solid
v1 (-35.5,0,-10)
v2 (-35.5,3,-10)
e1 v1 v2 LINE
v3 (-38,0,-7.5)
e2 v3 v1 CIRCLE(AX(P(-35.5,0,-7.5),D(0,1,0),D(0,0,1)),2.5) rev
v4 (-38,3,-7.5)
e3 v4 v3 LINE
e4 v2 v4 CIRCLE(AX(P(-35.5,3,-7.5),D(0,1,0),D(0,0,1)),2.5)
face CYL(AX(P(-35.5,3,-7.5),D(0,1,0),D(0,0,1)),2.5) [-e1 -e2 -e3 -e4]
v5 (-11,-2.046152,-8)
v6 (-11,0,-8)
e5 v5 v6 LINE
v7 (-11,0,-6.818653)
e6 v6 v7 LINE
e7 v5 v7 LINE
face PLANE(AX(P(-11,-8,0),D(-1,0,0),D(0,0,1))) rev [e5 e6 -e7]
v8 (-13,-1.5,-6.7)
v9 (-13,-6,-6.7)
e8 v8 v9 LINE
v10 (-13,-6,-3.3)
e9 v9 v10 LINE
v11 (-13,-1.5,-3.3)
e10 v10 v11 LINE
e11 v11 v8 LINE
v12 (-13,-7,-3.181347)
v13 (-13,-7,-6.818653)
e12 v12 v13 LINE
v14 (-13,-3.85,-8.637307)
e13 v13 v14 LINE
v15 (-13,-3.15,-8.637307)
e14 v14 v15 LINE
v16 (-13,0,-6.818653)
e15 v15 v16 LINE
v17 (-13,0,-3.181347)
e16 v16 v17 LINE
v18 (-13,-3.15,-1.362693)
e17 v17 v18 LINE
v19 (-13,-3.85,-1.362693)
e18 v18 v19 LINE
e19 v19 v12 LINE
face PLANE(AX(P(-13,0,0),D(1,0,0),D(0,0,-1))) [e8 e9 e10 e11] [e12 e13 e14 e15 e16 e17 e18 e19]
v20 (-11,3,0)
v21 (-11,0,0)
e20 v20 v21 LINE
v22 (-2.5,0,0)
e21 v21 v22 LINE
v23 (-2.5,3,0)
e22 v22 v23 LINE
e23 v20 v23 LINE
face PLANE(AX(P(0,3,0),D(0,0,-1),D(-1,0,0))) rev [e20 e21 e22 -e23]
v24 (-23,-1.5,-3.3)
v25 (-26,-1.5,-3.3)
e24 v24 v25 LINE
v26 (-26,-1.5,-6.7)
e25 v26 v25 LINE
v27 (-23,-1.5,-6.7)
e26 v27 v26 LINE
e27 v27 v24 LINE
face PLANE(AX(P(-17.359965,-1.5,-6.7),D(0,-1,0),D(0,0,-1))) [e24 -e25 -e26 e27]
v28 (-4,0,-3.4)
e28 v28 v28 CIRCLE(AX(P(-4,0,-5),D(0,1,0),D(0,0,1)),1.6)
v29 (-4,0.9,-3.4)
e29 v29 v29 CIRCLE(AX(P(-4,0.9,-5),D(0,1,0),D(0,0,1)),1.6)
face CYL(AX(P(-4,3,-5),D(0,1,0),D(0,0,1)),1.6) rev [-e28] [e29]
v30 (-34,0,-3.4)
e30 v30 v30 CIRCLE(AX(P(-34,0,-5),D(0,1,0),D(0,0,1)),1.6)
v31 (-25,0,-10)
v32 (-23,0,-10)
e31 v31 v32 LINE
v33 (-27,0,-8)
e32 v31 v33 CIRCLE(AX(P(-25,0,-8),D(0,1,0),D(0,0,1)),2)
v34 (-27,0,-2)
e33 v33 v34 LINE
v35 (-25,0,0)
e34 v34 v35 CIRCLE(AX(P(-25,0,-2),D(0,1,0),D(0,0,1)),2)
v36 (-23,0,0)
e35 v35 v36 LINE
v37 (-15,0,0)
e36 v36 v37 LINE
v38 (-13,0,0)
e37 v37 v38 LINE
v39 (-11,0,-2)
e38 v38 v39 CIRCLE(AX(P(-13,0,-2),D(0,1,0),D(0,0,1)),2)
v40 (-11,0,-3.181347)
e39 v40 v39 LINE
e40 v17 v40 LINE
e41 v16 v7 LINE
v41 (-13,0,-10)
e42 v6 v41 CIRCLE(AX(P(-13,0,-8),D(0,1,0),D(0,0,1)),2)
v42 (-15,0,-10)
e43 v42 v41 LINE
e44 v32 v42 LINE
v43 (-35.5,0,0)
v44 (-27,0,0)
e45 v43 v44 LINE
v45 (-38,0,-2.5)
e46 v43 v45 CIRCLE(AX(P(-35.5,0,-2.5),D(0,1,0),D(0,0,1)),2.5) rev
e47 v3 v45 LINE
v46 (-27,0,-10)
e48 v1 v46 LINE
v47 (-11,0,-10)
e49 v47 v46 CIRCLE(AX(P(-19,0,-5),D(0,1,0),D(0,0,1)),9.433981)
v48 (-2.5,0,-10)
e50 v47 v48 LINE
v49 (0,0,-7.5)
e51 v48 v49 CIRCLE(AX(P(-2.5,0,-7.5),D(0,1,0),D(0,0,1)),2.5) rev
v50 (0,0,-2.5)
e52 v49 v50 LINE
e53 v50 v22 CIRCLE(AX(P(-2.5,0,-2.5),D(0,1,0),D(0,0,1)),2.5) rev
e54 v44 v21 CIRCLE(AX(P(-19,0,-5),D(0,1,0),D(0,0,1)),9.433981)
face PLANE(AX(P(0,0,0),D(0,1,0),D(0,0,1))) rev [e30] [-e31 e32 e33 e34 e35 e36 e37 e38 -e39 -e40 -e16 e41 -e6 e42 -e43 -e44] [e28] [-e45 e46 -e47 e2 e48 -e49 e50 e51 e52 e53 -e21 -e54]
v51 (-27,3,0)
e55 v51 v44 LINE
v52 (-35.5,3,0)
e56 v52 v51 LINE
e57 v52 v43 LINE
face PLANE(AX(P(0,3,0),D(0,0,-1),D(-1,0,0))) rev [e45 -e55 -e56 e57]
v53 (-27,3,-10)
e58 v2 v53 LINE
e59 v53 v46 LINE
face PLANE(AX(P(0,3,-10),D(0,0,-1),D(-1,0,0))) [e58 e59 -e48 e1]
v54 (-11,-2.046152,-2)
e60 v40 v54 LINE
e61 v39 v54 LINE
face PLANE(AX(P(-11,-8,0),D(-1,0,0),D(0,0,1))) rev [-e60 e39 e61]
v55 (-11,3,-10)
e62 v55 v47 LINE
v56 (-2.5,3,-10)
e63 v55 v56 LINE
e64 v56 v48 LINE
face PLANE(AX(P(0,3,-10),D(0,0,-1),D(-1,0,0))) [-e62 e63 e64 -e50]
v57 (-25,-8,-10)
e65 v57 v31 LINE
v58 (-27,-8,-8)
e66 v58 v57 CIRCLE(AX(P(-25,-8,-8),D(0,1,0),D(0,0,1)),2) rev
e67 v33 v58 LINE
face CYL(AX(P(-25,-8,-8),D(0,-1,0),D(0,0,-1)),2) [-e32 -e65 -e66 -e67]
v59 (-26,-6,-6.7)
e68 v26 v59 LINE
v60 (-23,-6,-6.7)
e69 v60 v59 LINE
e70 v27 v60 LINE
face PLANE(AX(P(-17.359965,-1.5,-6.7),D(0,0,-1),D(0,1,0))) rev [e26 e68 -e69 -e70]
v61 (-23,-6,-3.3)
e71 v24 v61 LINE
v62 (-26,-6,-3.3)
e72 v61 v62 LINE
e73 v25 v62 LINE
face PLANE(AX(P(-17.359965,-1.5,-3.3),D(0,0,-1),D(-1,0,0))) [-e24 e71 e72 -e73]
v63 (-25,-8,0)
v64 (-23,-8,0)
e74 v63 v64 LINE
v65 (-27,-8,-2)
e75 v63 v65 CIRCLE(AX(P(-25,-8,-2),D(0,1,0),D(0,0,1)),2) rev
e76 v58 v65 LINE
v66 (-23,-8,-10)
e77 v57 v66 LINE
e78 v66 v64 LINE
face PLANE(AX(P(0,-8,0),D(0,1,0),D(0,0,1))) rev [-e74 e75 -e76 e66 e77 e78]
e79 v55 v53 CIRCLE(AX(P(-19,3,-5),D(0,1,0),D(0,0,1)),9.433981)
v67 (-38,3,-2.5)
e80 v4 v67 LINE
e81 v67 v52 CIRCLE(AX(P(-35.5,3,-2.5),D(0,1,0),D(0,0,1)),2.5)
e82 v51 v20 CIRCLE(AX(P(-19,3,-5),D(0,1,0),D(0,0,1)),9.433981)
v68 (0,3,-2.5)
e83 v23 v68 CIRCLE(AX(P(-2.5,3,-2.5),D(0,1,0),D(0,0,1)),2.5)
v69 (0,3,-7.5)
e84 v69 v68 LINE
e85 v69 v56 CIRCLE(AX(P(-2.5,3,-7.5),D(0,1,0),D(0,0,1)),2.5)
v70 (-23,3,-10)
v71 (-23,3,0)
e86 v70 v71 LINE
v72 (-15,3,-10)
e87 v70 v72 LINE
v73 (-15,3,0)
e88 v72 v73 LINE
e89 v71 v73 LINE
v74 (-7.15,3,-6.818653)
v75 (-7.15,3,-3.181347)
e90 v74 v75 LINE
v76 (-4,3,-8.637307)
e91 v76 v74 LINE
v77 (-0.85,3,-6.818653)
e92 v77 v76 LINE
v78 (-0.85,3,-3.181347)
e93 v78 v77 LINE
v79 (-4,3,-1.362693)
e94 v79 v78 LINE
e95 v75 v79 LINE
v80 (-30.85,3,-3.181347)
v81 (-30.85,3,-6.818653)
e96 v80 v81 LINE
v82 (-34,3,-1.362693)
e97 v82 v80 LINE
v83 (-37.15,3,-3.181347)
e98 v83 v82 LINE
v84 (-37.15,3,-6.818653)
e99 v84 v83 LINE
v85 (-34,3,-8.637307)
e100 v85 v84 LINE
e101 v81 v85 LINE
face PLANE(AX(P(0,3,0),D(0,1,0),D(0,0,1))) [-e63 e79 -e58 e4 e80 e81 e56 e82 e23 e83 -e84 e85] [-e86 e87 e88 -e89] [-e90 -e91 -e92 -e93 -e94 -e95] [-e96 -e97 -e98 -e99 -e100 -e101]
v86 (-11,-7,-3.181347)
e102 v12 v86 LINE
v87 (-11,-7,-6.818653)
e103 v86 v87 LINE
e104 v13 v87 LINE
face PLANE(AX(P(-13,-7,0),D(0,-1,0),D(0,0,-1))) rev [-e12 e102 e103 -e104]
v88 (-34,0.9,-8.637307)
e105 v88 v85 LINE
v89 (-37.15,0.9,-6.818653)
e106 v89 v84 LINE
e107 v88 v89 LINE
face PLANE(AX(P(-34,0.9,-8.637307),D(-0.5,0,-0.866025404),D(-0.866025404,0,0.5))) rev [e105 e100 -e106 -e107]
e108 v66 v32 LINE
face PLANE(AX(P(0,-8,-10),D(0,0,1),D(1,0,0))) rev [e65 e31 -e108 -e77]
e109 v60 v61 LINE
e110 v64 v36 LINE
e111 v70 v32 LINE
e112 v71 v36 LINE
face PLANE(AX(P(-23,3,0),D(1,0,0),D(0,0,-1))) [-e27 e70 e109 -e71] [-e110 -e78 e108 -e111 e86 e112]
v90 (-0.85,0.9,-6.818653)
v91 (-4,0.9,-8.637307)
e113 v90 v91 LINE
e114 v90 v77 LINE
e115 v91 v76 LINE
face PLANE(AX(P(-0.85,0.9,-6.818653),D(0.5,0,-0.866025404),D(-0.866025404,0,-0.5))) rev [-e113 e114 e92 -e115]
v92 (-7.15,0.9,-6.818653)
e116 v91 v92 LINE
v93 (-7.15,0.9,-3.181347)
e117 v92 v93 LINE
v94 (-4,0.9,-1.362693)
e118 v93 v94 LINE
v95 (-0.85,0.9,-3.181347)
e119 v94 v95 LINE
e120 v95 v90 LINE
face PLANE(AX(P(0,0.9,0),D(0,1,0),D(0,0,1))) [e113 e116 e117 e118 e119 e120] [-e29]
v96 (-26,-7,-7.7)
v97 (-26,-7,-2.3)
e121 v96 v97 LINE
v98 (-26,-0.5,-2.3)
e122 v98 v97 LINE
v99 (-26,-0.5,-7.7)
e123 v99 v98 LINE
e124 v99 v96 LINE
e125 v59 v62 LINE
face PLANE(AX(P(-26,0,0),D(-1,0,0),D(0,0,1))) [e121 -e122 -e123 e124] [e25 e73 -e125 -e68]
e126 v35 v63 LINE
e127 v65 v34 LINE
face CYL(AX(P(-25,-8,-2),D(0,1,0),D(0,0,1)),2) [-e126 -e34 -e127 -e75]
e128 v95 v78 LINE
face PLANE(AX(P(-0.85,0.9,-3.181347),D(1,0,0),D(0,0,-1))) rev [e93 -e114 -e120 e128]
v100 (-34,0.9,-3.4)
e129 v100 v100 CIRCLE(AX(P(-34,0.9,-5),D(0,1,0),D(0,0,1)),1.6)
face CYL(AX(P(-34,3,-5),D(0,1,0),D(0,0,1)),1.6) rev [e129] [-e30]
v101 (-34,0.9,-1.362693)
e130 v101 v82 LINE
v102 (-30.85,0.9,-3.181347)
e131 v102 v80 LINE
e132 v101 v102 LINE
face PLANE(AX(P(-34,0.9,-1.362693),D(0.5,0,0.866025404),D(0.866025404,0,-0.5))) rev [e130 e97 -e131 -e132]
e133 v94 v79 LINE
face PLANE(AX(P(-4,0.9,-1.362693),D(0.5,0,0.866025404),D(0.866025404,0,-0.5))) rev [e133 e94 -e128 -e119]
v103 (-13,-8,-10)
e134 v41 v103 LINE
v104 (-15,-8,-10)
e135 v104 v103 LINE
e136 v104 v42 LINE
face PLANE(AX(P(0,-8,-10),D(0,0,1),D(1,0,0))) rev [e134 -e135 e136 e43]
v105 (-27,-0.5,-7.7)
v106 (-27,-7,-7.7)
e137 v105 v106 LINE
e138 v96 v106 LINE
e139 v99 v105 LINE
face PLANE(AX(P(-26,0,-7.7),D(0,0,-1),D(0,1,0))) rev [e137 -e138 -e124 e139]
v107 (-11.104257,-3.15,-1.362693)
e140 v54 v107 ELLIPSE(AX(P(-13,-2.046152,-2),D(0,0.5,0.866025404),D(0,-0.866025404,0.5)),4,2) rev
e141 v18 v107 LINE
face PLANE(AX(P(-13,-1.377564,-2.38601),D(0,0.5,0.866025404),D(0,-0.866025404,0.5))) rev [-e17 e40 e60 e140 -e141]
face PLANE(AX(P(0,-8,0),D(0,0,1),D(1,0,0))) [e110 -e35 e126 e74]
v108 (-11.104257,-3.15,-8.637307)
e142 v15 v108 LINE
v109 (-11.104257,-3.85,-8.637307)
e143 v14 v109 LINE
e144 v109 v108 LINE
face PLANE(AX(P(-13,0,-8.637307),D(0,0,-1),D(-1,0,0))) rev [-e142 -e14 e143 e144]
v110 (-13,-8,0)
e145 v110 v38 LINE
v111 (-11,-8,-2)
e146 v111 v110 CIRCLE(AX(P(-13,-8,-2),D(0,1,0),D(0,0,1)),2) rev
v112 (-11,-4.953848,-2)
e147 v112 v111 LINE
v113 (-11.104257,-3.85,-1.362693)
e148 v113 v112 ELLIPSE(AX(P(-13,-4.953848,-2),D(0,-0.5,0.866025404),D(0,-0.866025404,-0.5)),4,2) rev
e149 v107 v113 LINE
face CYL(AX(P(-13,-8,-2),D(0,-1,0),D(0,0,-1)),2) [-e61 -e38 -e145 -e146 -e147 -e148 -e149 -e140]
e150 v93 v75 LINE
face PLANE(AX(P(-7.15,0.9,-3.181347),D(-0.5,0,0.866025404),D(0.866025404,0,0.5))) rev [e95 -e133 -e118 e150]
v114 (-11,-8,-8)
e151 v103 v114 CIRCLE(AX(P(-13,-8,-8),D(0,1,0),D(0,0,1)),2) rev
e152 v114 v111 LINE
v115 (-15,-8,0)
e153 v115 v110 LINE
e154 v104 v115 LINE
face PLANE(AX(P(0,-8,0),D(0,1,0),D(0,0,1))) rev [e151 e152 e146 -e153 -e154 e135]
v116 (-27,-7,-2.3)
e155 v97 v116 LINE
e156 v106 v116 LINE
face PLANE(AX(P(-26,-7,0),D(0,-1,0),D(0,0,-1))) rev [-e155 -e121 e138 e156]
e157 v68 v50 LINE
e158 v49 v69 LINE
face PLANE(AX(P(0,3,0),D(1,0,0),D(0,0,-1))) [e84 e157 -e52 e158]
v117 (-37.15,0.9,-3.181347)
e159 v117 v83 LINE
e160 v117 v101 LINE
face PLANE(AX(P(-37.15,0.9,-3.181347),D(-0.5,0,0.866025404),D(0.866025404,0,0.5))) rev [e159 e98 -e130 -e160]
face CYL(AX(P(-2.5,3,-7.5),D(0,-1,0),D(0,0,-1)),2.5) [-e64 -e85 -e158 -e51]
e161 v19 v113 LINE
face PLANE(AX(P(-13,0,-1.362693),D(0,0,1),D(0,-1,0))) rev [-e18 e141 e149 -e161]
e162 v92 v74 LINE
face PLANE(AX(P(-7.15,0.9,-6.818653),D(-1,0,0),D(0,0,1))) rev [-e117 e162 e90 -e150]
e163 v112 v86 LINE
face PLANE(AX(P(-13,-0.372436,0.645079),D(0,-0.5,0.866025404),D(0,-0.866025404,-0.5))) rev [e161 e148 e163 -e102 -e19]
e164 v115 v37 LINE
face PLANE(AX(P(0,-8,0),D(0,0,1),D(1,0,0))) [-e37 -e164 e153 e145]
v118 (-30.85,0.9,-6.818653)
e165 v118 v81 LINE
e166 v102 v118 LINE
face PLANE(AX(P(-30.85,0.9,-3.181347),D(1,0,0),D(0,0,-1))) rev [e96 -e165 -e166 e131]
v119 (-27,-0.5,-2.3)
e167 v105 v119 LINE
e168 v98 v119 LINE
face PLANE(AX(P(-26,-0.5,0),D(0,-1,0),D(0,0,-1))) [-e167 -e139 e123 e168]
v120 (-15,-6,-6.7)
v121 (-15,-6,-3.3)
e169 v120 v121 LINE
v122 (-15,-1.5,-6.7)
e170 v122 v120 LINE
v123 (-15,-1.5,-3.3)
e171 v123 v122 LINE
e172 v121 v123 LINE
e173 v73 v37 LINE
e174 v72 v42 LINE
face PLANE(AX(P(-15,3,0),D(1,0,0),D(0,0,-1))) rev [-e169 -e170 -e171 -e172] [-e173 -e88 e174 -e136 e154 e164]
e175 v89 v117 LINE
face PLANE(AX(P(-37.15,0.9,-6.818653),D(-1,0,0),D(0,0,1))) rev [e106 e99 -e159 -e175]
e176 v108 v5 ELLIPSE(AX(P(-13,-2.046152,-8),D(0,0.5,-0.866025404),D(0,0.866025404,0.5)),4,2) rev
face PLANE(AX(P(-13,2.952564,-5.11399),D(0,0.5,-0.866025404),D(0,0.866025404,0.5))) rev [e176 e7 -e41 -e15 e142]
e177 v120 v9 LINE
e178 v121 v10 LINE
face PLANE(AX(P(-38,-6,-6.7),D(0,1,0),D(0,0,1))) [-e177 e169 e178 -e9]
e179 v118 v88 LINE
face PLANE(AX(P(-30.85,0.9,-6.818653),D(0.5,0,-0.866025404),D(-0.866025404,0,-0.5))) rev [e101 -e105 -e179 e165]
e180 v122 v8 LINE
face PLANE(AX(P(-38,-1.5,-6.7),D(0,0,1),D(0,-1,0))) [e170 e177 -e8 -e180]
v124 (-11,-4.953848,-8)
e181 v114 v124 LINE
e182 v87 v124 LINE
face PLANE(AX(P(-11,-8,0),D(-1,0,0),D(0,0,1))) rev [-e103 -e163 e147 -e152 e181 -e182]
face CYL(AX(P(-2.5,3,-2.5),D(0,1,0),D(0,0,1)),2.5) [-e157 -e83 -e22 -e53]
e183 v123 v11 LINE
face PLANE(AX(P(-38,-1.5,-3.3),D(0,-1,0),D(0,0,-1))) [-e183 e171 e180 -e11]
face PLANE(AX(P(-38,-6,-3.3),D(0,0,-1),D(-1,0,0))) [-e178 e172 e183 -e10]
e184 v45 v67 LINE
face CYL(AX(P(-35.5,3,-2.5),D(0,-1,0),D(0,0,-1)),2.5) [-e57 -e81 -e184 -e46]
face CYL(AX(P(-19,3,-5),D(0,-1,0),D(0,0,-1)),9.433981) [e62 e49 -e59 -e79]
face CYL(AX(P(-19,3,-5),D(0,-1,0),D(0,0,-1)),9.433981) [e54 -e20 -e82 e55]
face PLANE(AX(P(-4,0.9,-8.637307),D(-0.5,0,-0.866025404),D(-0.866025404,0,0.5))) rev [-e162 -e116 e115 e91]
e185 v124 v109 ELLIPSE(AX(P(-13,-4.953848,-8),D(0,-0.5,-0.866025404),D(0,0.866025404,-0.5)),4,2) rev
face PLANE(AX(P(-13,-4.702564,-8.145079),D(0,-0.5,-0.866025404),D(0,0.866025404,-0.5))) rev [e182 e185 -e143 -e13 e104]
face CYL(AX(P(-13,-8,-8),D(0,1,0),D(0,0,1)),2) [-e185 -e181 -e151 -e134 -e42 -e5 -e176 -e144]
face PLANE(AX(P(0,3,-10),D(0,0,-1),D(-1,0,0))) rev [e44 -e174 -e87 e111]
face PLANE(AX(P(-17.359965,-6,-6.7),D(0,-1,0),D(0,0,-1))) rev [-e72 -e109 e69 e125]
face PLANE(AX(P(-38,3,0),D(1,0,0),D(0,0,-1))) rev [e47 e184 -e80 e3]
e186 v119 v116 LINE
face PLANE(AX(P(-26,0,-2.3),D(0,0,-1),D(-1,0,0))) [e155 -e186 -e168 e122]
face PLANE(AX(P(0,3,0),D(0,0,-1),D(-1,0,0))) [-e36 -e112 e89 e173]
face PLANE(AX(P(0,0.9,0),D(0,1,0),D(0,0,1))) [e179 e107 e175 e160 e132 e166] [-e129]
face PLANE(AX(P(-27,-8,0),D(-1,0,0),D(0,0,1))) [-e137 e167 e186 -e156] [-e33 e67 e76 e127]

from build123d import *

# Parameters (mm, degrees)
SKETCH1_W           = 11
SKETCH1_H           = 8
SKETCH1_W_2         = 4
SKETCH1_H_2         = 10
SKETCH1_H_3         = 1
BOSS_EXTRUDE1_DEPTH = 3
SKETCH1_3_W         = 4
SKETCH1_3_H         = 10
BOSS_EXTRUDE2_DEPTH = 8
CUT_EXTRUDE5_DEPTH  = 2.1
HOLE1_D             = 3.2
SKETCH5_W           = 3.4
SKETCH5_H           = 4.5
CUT_EXTRUDE1_DEPTH  = 4
CUT_EXTRUDE4_DEPTH  = 1
SKETCH6_W           = 3.4
SKETCH6_H           = 4.5
CUT_EXTRUDE2_DEPTH  = 2
SKETCH6_3_W         = 3.4
SKETCH6_3_H         = 4.5
CUT_EXTRUDE3_DEPTH  = 32.643953788
FILLET1_R           = 2.5
FILLET2_R           = 2


with BuildPart() as part:
    # Sketch1 → Boss-Extrude1 (new body)
    with BuildSketch(Plane(origin=(0, 0, 0), x_dir=(1, 0, 0), z_dir=(0, 1, 0))):
        with Locations((-32.5, 5)):
            Rectangle(SKETCH1_W, SKETCH1_H)
        Polygon((-23, 10), (-27, 10), (-27, 9), (-27, 1), (-27, 0), (-23, 0), align=None)
        with BuildLine():
            ThreePointArc((-11, 10), (-19, 14.433981132), (-27, 10))
            Line((-27, 10), (-23, 10))
            Line((-23, 10), (-15, 10))
            Line((-15, 10), (-11, 10))
        make_face()
        with Locations((-13, 5)):
            Rectangle(SKETCH1_W_2, SKETCH1_H_2)
        with BuildLine():
            Line((-15, 0), (-23, 0))
            Line((-23, 0), (-27, 0))
            ThreePointArc((-27, 0), (-19, -4.433981132), (-11, 0))
            Line((-11, 0), (-15, 0))
        make_face()
        with Locations((-5.5, 5)):
            Rectangle(SKETCH1_W, SKETCH1_H_2)
        with Locations((-32.5, 9.5)):
            Rectangle(SKETCH1_W, SKETCH1_H_3)
        with Locations((-32.5, 0.5)):
            Rectangle(SKETCH1_W, SKETCH1_H_3)
    extrude(amount=BOSS_EXTRUDE1_DEPTH)

    # Sketch1<3> → Boss-Extrude2 (add)
    with BuildSketch(Plane(origin=(0, 0, 0), x_dir=(1, 0, 0), z_dir=(0, 1, 0))):
        with Locations((-25, 5)):
            Rectangle(SKETCH1_3_W, SKETCH1_3_H)
        with Locations((-13, 5)):
            Rectangle(SKETCH1_3_W, SKETCH1_3_H)
    extrude(amount=-BOSS_EXTRUDE2_DEPTH)

    # Sketch3 → Cut-Extrude5 (cut)
    with BuildSketch(Plane(origin=(0, 3, 0), x_dir=(1, 0, 0), z_dir=(0, 1, 0))):
        Polygon((-7.15, 6.818653348), (-7.15, 3.181346652), (-4, 1.362693304), (-0.85, 3.181346652), (-0.85, 6.818653348), (-4, 8.637306696), align=None)
        Polygon((-30.85, 3.181346652), (-30.85, 6.818653348), (-34, 8.637306696), (-37.15, 6.818653348), (-37.15, 3.181346652), (-34, 1.362693304), align=None)
    extrude(amount=-CUT_EXTRUDE5_DEPTH, mode=Mode.SUBTRACT)

    # Hole1 (through all)
    with Locations(Plane(origin=(-4, 3, -5), x_dir=(0, 0, 1), z_dir=(0, 1, 0))):
        with Locations((0, 0), (0, -30)):
            Hole(HOLE1_D / 2)

    # Sketch5 → Cut-Extrude1 (cut)
    with BuildSketch(Plane.ZY.offset(27)):
        with Locations((-5, -3.75)):
            Rectangle(SKETCH5_W, SKETCH5_H)
    extrude(amount=-CUT_EXTRUDE1_DEPTH, mode=Mode.SUBTRACT)

    # Sketch5<4> → Cut-Extrude4 (cut)
    with BuildSketch(Plane.ZY.offset(27)):
        Polygon((-5, -1.5), (-5, -0.5), (-7.7, -0.5), (-7.7, -7), (-5, -7), (-5, -6), (-6.7, -6), (-6.7, -1.5), align=None)
        Polygon((-2.3, -0.5), (-5, -0.5), (-5, -1.5), (-3.3, -1.5), (-3.3, -6), (-5, -6), (-5, -7), (-2.3, -7), align=None)
    extrude(amount=-CUT_EXTRUDE4_DEPTH, mode=Mode.SUBTRACT)

    # Sketch6 → Cut-Extrude2 (cut)
    # profile 1 of 5: a face of its own
    with BuildSketch(Plane(origin=(-11, 0, 0), x_dir=(0, 0, -1), z_dir=(1, 0, 0))):
        Polygon((3.181346652, -6.3), (6.818653348, -6.3), (8.435234102, -3.5), (6.818653348, -0.7), (3.181346652, -0.7), (1.564765898, -3.5), align=None)
        with Locations((5, -3.75)):
            Rectangle(SKETCH6_W, SKETCH6_H, mode=Mode.SUBTRACT)
    # profile 2 of 5: a face of its own
    with BuildSketch(Plane(origin=(-11, 0, 0), x_dir=(0, 0, -1), z_dir=(1, 0, 0))):
        Polygon((8.435234102, -3.5), (6.818653348, -6.3), (3.181346652, -6.3), (1.564765898, -3.5), (1.362693304, -3.85), (3.181346652, -7), (6.818653348, -7), (8.637306696, -3.85), align=None)
    # profile 3 of 5: a face of its own
    with BuildSketch(Plane(origin=(-11, 0, 0), x_dir=(0, 0, -1), z_dir=(1, 0, 0))):
        Polygon((6.818653348, -0.7), (8.435234102, -3.5), (8.637306696, -3.15), (6.818653348, 0), (3.181346652, 0), (1.362693304, -3.15), (1.564765898, -3.5), (3.181346652, -0.7), align=None)
    # profile 4 of 5: a face of its own
    with BuildSketch(Plane(origin=(-11, 0, 0), x_dir=(0, 0, -1), z_dir=(1, 0, 0))):
        Polygon((8.637306696, -3.15), (8.435234102, -3.5), (8.637306696, -3.85), align=None)
    # profile 5 of 5: a face of its own
    with BuildSketch(Plane(origin=(-11, 0, 0), x_dir=(0, 0, -1), z_dir=(1, 0, 0))):
        Polygon((1.362693304, -3.85), (1.564765898, -3.5), (1.362693304, -3.15), align=None)
    extrude(amount=-CUT_EXTRUDE2_DEPTH, mode=Mode.SUBTRACT)

    # Sketch6<3> → Cut-Extrude3 (cut, through all)
    with BuildSketch(Plane(origin=(-11, 0, 0), x_dir=(0, 0, -1), z_dir=(1, 0, 0))):
        with Locations((5, -3.75)):
            Rectangle(SKETCH6_3_W, SKETCH6_3_H)
    extrude(amount=-CUT_EXTRUDE3_DEPTH, mode=Mode.SUBTRACT)

    # Fillet1
    fillet1_edges = [part.edges().sort_by_distance(p)[0] for p in [
        (-38, 1.5, 0),
        (-38, 1.5, -10),
        (0, 1.5, -10),
        (0, 1.5, 0),
    ]]
    fillet(fillet1_edges, radius=FILLET1_R)

    # Fillet2
    # the kernel refuses this fillet: 2 mm, written as the material it takes off along each edge
    with BuildSketch(Plane(origin=(-11, 0, 0), x_dir=(-1, 0, 0), z_dir=(0, -1, 0)), Plane(origin=(-27, 0, -10), x_dir=(1, 0, 0), z_dir=(0, -1, 0))) as fillet2_piece_1:
        with BuildLine():
            CenterArc((FILLET2_R, FILLET2_R), FILLET2_R, 180, 90)
            Line((0, FILLET2_R), (0, 0))
            Line((0, 0), (FILLET2_R, 0))
        make_face()
    extrude(amount=13, mode=Mode.SUBTRACT)
    with BuildSketch(Plane(origin=(-11, 0, -10), x_dir=(-1, 0, 0), z_dir=(0, -1, 0)), Plane(origin=(-27, 0, 0), x_dir=(1, 0, 0), z_dir=(0, -1, 0))) as fillet2_piece_2:
        with BuildLine():
            CenterArc((FILLET2_R, -FILLET2_R), FILLET2_R, 90, 90)
            Line((0, -FILLET2_R), (0, 0))
            Line((0, 0), (FILLET2_R, 0))
        make_face()
    extrude(amount=13, mode=Mode.SUBTRACT)


solid = part.part
